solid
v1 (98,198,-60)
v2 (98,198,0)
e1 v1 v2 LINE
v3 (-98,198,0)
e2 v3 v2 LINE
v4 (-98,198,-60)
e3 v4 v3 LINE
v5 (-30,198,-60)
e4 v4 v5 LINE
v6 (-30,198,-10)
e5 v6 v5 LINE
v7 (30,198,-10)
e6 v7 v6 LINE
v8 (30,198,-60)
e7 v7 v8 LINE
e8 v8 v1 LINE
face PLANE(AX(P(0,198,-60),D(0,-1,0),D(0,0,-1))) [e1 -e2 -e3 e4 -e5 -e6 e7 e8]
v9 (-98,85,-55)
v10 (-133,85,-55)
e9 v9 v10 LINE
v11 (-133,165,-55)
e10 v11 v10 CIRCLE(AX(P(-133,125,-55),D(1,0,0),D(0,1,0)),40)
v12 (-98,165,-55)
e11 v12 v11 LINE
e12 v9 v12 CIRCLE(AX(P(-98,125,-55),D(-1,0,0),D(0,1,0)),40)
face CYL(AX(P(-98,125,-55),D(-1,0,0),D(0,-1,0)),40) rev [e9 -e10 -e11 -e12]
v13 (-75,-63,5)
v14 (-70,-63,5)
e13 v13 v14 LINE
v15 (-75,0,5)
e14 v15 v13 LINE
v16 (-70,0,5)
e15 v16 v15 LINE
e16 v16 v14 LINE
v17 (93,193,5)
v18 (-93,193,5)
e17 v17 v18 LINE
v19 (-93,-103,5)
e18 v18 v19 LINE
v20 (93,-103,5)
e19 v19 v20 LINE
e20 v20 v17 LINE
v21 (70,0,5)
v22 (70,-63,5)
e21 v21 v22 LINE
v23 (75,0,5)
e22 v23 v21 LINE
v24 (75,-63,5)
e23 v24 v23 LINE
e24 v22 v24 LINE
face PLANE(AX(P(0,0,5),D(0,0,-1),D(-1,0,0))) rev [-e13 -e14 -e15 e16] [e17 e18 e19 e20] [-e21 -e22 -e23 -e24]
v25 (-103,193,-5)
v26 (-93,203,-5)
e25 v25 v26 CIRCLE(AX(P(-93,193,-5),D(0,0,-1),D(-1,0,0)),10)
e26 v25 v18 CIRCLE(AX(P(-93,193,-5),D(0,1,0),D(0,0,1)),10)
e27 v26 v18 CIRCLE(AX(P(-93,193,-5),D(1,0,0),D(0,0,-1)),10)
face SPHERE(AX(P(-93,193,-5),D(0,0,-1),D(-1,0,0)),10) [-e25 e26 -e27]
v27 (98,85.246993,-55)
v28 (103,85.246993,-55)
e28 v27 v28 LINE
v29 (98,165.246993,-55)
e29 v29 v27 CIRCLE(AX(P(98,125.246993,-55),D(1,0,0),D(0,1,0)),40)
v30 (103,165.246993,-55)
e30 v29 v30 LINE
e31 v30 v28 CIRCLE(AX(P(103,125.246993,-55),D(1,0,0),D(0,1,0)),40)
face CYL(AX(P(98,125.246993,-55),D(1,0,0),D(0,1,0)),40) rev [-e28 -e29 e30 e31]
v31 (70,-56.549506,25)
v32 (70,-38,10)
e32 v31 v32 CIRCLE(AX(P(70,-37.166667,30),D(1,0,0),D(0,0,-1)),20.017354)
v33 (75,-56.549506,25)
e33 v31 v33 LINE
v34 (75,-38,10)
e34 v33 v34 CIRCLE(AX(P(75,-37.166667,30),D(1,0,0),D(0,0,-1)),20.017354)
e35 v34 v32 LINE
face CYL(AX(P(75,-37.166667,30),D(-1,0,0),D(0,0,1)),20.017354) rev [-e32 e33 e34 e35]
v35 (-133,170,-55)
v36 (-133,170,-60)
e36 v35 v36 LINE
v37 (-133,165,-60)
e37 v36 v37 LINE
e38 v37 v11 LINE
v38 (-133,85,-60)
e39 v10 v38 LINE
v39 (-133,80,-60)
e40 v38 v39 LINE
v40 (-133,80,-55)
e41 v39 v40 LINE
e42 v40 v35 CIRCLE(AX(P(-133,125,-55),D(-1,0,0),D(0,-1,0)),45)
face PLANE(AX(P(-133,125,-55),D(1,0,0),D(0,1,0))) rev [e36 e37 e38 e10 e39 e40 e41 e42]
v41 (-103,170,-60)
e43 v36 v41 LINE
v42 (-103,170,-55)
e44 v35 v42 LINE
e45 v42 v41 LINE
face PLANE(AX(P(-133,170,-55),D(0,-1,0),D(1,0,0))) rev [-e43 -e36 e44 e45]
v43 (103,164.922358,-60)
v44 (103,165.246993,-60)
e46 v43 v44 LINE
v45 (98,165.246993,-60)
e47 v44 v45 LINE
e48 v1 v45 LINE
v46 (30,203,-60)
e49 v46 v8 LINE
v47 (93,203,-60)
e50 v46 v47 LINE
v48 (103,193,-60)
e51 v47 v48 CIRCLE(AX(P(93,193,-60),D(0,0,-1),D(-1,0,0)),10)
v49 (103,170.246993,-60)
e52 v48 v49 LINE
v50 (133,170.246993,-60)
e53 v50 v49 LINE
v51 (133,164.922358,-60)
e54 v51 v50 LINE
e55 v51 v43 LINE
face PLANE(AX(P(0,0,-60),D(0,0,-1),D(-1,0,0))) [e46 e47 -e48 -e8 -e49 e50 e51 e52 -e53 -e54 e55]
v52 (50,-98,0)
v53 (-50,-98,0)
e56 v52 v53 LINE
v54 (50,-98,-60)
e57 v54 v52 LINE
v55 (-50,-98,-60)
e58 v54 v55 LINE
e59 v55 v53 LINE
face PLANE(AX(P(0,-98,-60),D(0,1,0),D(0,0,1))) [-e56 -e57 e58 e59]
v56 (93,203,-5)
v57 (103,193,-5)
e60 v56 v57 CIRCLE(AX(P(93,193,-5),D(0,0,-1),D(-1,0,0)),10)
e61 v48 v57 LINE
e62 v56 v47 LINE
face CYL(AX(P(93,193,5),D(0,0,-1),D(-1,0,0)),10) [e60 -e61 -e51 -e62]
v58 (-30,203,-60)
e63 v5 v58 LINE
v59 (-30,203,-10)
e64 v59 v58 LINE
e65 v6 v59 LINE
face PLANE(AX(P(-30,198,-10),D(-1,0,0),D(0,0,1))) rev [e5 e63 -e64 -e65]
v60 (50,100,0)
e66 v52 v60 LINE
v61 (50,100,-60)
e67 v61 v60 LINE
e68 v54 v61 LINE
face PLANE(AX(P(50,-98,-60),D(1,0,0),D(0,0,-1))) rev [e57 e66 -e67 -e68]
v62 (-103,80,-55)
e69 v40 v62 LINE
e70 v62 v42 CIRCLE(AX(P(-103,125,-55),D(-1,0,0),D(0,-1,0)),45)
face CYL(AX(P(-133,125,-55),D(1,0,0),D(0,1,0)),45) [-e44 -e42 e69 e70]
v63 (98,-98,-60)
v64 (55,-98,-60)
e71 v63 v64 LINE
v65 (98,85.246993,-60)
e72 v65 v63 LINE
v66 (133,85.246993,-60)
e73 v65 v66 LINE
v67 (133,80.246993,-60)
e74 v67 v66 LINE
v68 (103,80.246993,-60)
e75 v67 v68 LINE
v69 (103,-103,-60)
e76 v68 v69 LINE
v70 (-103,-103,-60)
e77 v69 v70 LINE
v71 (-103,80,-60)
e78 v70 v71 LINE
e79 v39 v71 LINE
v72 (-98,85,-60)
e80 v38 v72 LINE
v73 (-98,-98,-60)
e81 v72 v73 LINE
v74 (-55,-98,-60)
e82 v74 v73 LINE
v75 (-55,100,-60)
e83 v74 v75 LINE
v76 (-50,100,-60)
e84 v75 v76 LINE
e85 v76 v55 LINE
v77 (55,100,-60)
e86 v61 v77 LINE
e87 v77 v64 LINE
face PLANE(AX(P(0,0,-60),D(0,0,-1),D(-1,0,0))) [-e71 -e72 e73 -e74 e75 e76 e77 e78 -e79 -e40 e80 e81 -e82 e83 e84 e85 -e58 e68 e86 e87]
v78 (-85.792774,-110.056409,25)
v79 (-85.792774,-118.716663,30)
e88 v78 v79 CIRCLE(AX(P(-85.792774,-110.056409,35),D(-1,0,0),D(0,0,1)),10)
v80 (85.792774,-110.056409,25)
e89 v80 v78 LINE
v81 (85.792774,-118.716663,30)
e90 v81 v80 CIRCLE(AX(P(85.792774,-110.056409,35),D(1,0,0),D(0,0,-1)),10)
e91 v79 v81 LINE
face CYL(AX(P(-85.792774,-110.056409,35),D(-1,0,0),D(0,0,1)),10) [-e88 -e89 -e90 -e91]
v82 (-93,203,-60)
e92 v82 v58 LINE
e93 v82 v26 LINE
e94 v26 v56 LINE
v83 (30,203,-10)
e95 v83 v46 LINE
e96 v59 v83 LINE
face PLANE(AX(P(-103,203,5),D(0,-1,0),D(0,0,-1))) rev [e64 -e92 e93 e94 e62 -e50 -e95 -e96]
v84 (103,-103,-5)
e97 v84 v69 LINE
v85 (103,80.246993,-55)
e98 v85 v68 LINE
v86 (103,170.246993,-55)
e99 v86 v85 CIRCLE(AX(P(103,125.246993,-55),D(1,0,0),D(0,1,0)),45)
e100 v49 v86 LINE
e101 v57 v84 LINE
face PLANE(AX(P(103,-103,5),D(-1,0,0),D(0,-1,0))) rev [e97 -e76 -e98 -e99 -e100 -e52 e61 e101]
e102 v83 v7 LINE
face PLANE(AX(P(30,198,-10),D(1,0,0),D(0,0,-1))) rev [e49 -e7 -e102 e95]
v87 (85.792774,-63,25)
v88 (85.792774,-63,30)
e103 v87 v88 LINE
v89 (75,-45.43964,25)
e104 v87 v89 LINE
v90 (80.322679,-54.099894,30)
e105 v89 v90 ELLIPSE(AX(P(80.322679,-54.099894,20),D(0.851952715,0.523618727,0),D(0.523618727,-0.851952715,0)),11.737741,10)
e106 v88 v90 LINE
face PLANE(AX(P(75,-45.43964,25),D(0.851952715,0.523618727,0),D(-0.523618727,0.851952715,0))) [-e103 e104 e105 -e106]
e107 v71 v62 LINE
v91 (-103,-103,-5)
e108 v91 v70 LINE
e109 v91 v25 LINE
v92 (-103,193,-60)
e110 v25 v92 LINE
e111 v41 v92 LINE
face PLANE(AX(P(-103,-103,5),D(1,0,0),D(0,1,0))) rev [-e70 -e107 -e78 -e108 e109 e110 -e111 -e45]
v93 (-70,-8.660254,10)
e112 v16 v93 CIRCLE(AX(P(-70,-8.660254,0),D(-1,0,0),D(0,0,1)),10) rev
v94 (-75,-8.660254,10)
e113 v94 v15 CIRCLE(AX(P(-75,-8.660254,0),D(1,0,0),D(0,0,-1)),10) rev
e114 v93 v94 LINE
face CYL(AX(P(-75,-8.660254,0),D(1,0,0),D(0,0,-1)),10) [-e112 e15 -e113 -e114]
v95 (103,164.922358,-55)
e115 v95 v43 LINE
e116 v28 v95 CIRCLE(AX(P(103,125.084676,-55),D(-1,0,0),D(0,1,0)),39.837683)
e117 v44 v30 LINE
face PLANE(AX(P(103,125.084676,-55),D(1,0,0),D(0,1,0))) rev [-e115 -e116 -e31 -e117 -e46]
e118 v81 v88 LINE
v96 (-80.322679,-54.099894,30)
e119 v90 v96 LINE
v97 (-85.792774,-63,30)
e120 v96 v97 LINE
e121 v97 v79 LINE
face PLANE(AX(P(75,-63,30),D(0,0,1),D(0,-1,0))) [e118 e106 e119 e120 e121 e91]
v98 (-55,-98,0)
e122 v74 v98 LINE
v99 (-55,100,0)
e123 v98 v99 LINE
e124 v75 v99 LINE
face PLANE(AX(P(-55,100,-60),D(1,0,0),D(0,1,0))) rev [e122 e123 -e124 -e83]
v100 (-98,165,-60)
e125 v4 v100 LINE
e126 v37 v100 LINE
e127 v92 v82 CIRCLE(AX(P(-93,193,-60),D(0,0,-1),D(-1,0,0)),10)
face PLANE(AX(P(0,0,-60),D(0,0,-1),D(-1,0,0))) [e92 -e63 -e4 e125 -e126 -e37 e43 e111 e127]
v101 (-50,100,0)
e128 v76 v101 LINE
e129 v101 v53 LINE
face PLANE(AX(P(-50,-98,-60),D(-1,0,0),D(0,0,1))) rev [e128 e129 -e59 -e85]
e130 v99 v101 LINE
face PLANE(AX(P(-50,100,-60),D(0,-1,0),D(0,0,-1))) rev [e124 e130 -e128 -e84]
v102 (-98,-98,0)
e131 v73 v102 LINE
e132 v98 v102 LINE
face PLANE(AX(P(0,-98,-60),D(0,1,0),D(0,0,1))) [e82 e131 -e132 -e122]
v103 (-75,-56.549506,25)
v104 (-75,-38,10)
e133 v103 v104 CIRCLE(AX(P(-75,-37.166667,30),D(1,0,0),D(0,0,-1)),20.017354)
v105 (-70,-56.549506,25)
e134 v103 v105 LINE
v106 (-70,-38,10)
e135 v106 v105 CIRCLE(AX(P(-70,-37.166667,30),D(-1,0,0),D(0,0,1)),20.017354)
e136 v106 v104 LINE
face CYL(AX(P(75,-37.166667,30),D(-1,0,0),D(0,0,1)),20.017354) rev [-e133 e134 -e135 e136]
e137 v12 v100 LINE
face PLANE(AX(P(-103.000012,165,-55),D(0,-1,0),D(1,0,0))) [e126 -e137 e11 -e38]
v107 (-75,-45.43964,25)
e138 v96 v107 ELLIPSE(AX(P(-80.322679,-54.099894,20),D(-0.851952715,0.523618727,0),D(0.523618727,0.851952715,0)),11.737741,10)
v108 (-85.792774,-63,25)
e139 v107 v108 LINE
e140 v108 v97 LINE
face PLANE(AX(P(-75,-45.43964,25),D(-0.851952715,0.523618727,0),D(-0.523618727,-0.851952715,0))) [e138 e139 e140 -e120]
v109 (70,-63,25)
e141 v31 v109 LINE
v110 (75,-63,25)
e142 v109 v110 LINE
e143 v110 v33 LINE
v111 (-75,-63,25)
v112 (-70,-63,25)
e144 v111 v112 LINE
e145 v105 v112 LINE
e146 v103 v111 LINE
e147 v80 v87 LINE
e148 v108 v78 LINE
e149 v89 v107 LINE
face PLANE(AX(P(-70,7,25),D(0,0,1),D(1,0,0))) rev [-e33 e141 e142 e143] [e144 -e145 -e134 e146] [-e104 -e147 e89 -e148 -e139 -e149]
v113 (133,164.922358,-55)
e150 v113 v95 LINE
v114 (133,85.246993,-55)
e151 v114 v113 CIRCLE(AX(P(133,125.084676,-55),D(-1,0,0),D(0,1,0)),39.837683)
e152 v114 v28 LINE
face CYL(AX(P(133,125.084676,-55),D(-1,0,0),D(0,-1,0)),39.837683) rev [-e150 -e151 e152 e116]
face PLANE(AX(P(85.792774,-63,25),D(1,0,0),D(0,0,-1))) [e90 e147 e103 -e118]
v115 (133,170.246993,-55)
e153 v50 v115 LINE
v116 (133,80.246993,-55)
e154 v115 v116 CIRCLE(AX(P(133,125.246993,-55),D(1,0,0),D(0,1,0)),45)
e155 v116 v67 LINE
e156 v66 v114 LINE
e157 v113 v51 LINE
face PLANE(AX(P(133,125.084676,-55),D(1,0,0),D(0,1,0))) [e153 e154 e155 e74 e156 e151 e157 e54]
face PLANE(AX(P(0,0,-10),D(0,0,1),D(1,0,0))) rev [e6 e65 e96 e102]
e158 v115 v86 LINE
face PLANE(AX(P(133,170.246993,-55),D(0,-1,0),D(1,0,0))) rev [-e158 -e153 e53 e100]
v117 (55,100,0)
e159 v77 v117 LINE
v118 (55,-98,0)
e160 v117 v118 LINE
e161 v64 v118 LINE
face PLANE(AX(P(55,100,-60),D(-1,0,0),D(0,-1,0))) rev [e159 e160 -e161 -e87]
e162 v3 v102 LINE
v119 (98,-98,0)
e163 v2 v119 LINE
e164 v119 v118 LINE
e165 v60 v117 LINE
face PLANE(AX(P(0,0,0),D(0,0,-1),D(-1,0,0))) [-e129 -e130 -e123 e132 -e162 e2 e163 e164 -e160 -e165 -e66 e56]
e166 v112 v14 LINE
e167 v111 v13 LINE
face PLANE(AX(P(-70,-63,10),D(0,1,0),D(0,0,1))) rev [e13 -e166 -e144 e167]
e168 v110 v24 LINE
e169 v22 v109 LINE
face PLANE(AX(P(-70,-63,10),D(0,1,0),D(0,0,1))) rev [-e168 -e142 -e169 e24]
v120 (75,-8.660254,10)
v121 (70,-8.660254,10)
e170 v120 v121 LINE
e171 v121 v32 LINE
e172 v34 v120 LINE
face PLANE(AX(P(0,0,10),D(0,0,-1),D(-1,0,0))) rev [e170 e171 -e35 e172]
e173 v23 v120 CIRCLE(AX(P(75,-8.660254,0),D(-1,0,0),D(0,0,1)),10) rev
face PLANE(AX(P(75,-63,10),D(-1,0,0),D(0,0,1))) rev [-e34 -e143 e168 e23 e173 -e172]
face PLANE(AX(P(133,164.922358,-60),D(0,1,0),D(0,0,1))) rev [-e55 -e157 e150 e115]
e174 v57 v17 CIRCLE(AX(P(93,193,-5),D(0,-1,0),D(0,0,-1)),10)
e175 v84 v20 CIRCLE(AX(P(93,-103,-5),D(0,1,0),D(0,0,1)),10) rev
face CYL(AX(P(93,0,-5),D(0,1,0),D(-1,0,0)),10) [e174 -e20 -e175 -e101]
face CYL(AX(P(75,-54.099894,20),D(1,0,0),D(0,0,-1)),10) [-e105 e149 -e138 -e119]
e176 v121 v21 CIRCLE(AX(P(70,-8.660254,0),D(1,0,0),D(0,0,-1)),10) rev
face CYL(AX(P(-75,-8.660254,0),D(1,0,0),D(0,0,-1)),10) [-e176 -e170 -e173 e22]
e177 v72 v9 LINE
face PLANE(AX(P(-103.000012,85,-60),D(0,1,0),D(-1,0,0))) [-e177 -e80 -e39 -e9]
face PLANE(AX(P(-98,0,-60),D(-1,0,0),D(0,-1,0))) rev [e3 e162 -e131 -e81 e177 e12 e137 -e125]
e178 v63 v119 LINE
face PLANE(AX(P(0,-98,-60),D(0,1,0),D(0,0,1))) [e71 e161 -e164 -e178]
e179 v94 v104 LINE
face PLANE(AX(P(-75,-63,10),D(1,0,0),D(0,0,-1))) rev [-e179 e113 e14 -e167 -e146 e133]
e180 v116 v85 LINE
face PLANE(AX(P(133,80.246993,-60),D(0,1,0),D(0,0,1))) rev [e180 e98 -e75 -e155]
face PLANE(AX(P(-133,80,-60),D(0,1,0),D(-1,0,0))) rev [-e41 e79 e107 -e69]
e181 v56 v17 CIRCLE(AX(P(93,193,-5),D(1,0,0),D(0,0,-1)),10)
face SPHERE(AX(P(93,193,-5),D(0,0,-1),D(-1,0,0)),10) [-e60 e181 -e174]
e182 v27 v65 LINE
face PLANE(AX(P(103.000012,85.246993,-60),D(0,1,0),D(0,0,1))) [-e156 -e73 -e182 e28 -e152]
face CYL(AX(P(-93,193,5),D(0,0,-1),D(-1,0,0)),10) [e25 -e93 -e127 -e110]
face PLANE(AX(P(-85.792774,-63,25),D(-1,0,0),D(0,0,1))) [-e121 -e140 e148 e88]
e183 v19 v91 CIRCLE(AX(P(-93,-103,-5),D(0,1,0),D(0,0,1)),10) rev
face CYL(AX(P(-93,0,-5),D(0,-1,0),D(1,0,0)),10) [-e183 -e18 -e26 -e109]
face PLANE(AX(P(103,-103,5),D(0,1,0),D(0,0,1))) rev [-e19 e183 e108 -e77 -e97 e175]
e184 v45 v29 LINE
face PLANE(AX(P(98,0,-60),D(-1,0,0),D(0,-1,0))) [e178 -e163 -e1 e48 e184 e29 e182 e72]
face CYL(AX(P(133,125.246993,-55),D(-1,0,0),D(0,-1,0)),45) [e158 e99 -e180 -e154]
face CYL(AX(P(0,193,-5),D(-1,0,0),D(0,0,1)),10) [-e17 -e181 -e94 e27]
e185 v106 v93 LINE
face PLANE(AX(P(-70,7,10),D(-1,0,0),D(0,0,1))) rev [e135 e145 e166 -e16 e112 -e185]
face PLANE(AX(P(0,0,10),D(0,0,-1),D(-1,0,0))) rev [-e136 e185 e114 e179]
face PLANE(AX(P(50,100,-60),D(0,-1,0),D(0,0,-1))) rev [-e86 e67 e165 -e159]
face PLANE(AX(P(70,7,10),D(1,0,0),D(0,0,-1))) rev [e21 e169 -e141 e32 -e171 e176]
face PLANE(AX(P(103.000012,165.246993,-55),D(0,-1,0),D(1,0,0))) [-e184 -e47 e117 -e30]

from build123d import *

# Parameters (mm, degrees)
SKETCH1_W               = 206
SKETCH1_H               = 306
BOSS_EXTRUDE2_DEPTH     = 5
SKETCH2_W               = 206
SKETCH2_H               = 306
SKETCH2_W_2             = 196
SKETCH2_H_2             = 296
BOSS_EXTRUDE3_DEPTH     = 60
SKETCH3_W               = 5
SKETCH3_H               = 198
BOSS_EXTRUDE4_DEPTH     = 60
SKETCH10_W              = 60
SKETCH10_H              = 5
CUT_EXTRUDE3_DEPTH      = 50
CUT_EXTRUDE4_DEPTH      = 296.372645991
CUT_EXTRUDE4_DEPTH_BACK = 5
BOSS_EXTRUDE6_DEPTH     = 30
CUT_EXTRUDE5_DEPTH      = 318.025235589
CUT_EXTRUDE5_DEPTH_BACK = 5
BOSS_EXTRUDE7_DEPTH     = 30
SKETCH16_W              = 5
SKETCH16_H              = 63
BOSS_EXTRUDE8_DEPTH     = 5
BOSS_EXTRUDE10_DEPTH    = 150
SKETCH19_W              = 140
SKETCH19_H              = 20
CUT_EXTRUDE6_DEPTH      = 70
BOSS_EXTRUDE11_DEPTH    = 5
FILLET3_R               = 10
FILLET4_R               = 10
FILLET5_R               = 10
FILLET6_R               = 10
FILLET7_R               = 10
FILLET8_R               = 10
FILLET9_R               = 10


with BuildPart() as part:
    # Sketch1 → Boss-Extrude2 (new body)
    with BuildSketch(Plane.XY):
        with Locations((0, 50)):
            Rectangle(SKETCH1_W, SKETCH1_H)
    extrude(amount=BOSS_EXTRUDE2_DEPTH)

    # Sketch2 → Boss-Extrude3 (add)
    with BuildSketch(Plane(origin=(0, 0, 0), x_dir=(-1, 0, 0), z_dir=(0, 0, -1))):
        with Locations((0, 50)):
            Rectangle(SKETCH2_W, SKETCH2_H)
        with Locations((0, 50)):
            Rectangle(SKETCH2_W_2, SKETCH2_H_2, mode=Mode.SUBTRACT)
    extrude(amount=BOSS_EXTRUDE3_DEPTH)

    # Sketch3 → Boss-Extrude4 (add)
    with BuildSketch(Plane(origin=(0, 0, 0), x_dir=(-1, 0, 0), z_dir=(0, 0, -1))):
        with Locations((-52.5, 1)):
            Rectangle(SKETCH3_W, SKETCH3_H)
        with Locations((52.5, 1)):
            Rectangle(SKETCH3_W, SKETCH3_H)
    extrude(amount=BOSS_EXTRUDE4_DEPTH)

    # Sketch10 → Cut-Extrude3 (cut)
    with BuildSketch(Plane(origin=(0, 0, -60), x_dir=(-1, 0, 0), z_dir=(0, 0, -1))):
        with Locations((0, 200.5)):
            Rectangle(SKETCH10_W, SKETCH10_H)
    extrude(amount=-CUT_EXTRUDE3_DEPTH, mode=Mode.SUBTRACT)

    # Sketch11 → Cut-Extrude4 (cut, two sides: drawn at the far end of the back side and taken through both)
    with BuildSketch(Plane(origin=(103, 0, 0), x_dir=(0, 0, -1), z_dir=(1, 0, 0)).offset(-CUT_EXTRUDE4_DEPTH_BACK)):
        with BuildLine():
            Line((55, 165.246993189), (60, 165.246993189))
            Line((60, 165.246993189), (60, 85.246993189))
            Line((60, 85.246993189), (55, 85.246993189))
            ThreePointArc((55, 85.246993189), (15, 125.246993189), (55, 165.246993189))
        make_face()
    extrude(amount=CUT_EXTRUDE4_DEPTH + CUT_EXTRUDE4_DEPTH_BACK, mode=Mode.SUBTRACT)

    # Sketch12 → Boss-Extrude6 (add)
    with BuildSketch(Plane(origin=(103, 0, 0), x_dir=(0, 0, -1), z_dir=(1, 0, 0))):
        with BuildLine():
            Line((55, 170.246993189), (60, 170.246993189))
            Line((60, 170.246993189), (60, 164.922358247))
            Line((60, 164.922358247), (55, 164.922358247))
            ThreePointArc((55, 164.922358247), (15.162317471, 125.084675718), (55, 85.246993189))
            Line((55, 85.246993189), (60, 85.246993189))
            Line((60, 85.246993189), (60, 80.246993189))
            Line((60, 80.246993189), (55, 80.246993189))
            ThreePointArc((55, 80.246993189), (10, 125.246993189), (55, 170.246993189))
        make_face()
    extrude(amount=BOSS_EXTRUDE6_DEPTH)

    # Sketch13 → Cut-Extrude5 (cut, two sides: drawn at the far end of the back side and taken through both)
    with BuildSketch(Plane.ZY.offset(103).offset(-CUT_EXTRUDE5_DEPTH_BACK)):
        with BuildLine():
            Line((-55, 165), (-60, 165))
            Line((-60, 165), (-60, 85))
            Line((-60, 85), (-55, 85))
            ThreePointArc((-55, 85), (-15, 125), (-55, 165))
        make_face()
    extrude(amount=CUT_EXTRUDE5_DEPTH + CUT_EXTRUDE5_DEPTH_BACK, mode=Mode.SUBTRACT)

    # Sketch14 → Boss-Extrude7 (add)
    with BuildSketch(Plane.ZY.offset(103)):
        with BuildLine():
            Line((-55, 170), (-60, 170))
            Line((-60, 170), (-60, 165))
            Line((-60, 165), (-55, 165))
            ThreePointArc((-55, 165), (-15, 125), (-55, 85))
            Line((-55, 85), (-60, 85))
            Line((-60, 85), (-60, 80))
            Line((-60, 80), (-55, 80))
            ThreePointArc((-55, 80), (-10, 125), (-55, 170))
        make_face()
    extrude(amount=BOSS_EXTRUDE7_DEPTH)

    # Sketch16 → Boss-Extrude8 (add)
    with BuildSketch(Plane.XY.offset(5)):
        with Locations((-72.5, -31.5)):
            Rectangle(SKETCH16_W, SKETCH16_H)
        with Locations((72.5, -31.5)):
            Rectangle(SKETCH16_W, SKETCH16_H)
    extrude(amount=BOSS_EXTRUDE8_DEPTH)

    # Sketch17 → Boss-Extrude10 (add)
    with BuildSketch(Plane.ZY.offset(75)):
        with BuildLine():
            Line((5, -63), (30, -63))
            Line((30, -63), (30, -57.184020249))
            ThreePointArc((30, -57.184020249), (16.143353283, -51.612696786), (10, -38))
            Line((10, -38), (10, 0))
            Line((10, 0), (5, 0))
            Line((5, 0), (5, -63))
        make_face()
    extrude(amount=-BOSS_EXTRUDE10_DEPTH)

    # Sketch19 → Cut-Extrude6 (cut)
    with BuildSketch(Plane.XZ.offset(63)):
        with Locations((0, 15)):
            Rectangle(SKETCH19_W, SKETCH19_H)
    extrude(amount=-CUT_EXTRUDE6_DEPTH, mode=Mode.SUBTRACT)

    # Sketch20 → Boss-Extrude11 (add)
    with BuildSketch(Plane.XY.offset(30)):
        Polygon((75, -45.439640401), (-75, -45.439640401), (-85.792774028, -63), (-85.792774028, -118.716663175), (85.792774028, -118.716663175), (85.792774028, -63), align=None)
    extrude(amount=-BOSS_EXTRUDE11_DEPTH)

    # Fillet3
    fillet3_edges = [part.edges().sort_by_distance(p)[0] for p in [
        (-103, 203, -27.5),
    ]]
    fillet(fillet3_edges, radius=FILLET3_R)

    # Fillet4
    fillet4_edges = [part.edges().sort_by_distance(p)[0] for p in [
        (103, 203, -27.5),
    ]]
    fillet(fillet4_edges, radius=FILLET4_R)

    # Fillet5
    # the kernel refuses this fillet: 10 mm, written as the material it takes off along each edge
    with BuildSketch(Plane(origin=(96.650635095, -45.439640401, 30), x_dir=(0, 0, -1), z_dir=(-1, 0, 0))) as fillet5_piece_1:
        with BuildLine():
            CenterArc((10, 8.660254038), FILLET5_R, 180, 60)
            Line((0, 8.660254038), (-0.2, 8.660254038))
            Line((-0.2, 8.660254038), (-0.2, 0))
            Line((-0.2, 0), (0, -0.2))
            ThreePointArc((0, -0.2), (2.5, -0.2), (4.9, -0.173205081))
            Line((4.9, -0.173205081), (5, 0))
        make_face()
    extrude(amount=193.301270189, mode=Mode.SUBTRACT)

    # Fillet6
    # the kernel refuses this fillet: 10 mm, written as the material it takes off along each edge
    with BuildSketch(Plane(origin=(-107.443409123, -118.716663175, 25), x_dir=(0, 1, 0), z_dir=(1, 0, 0))) as fillet6_piece_1:
        with BuildLine():
            CenterArc((8.660254038, 10), FILLET6_R, 210, 60)
            Line((0, 5), (-0.173205081, 4.9))
            ThreePointArc((-0.173205081, 4.9), (-0.2, 2.5), (-0.2, 0))
            Line((-0.2, 0), (0, -0.2))
            Line((0, -0.2), (8.660254038, -0.2))
            Line((8.660254038, -0.2), (8.660254038, 0))
        make_face()
    extrude(amount=214.886818246, mode=Mode.SUBTRACT)

    # Fillet7
    # the kernel refuses this fillet: 10 mm, written as the material it takes off along each edge
    with BuildSketch(Plane(origin=(-96.650635095, 0, 10), x_dir=(0, 0, -1), z_dir=(1, 0, 0))) as fillet7_piece_1:
        with BuildLine():
            CenterArc((10, -8.660254038), FILLET7_R, 120, 60)
            Line((0, -8.660254038), (-0.2, -8.660254038))
            Line((-0.2, -8.660254038), (-0.2, 0))
            Line((-0.2, 0), (0, 0.2))
            ThreePointArc((0, 0.2), (2.5, 0.2), (4.9, 0.173205081))
            Line((4.9, 0.173205081), (5, 0))
        make_face()
    extrude(amount=48.301270189, mode=Mode.SUBTRACT)

    # Fillet8
    # the kernel refuses this fillet: 10 mm, written as the material it takes off along each edge
    with BuildSketch(Plane(origin=(48.349364905, 0, 10), x_dir=(0, 0, -1), z_dir=(1, 0, 0))) as fillet8_piece_1:
        with BuildLine():
            CenterArc((10, -8.660254038), FILLET8_R, 120, 60)
            Line((0, -8.660254038), (-0.2, -8.660254038))
            Line((-0.2, -8.660254038), (-0.2, 0))
            Line((-0.2, 0), (0, 0.2))
            ThreePointArc((0, 0.2), (2.5, 0.2), (4.9, 0.173205081))
            Line((4.9, 0.173205081), (5, 0))
        make_face()
    extrude(amount=48.301270189, mode=Mode.SUBTRACT)

    # Fillet9
    # the kernel refuses this fillet: 10 mm, written as the material it takes off along each edge
    with BuildSketch(Plane(origin=(103, 193, 5), x_dir=(-1, 0, 0), z_dir=(0, -1, 0)), Plane(origin=(-103, -128, 5), x_dir=(1, 0, 0), z_dir=(0, 1, 0))) as fillet9_piece_1:
        with BuildLine():
            CenterArc((FILLET9_R, FILLET9_R), FILLET9_R, 180, 90)
            Line((0, FILLET9_R), (0, 0))
            Line((0, 0), (FILLET9_R, 0))
        make_face()
    extrude(amount=321, mode=Mode.SUBTRACT)
    with BuildSketch(Plane(origin=(-93, 193, 5), x_dir=(-1, 0, 0), z_dir=(0, -1, 0))) as fillet9_piece_2:
        with BuildLine():
            CenterArc((10 - FILLET9_R, FILLET9_R), FILLET9_R, 270, 90)
            Line((10, FILLET9_R), (10, 0))
            Line((10, 0), (10 - FILLET9_R, 0))
        make_face()
    revolve(axis=Axis((-93, 193, 5), (0, 0, -1)), revolution_arc=90, mode=Mode.SUBTRACT)
    with BuildSketch(Plane(origin=(-93, 203, 5), x_dir=(0, -1, 0), z_dir=(1, 0, 0))) as fillet9_piece_3:
        with BuildLine():
            CenterArc((FILLET9_R, FILLET9_R), FILLET9_R, 180, 90)
            Line((0, FILLET9_R), (0, 0))
            Line((0, 0), (FILLET9_R, 0))
        make_face()
    extrude(amount=186, mode=Mode.SUBTRACT)
    with BuildSketch(Plane(origin=(93, 193, 5), x_dir=(0, 1, 0), z_dir=(-1, 0, 0))) as fillet9_piece_4:
        with BuildLine():
            CenterArc((10 - FILLET9_R, FILLET9_R), FILLET9_R, 270, 90)
            Line((10, FILLET9_R), (10, 0))
            Line((10, 0), (10 - FILLET9_R, 0))
        make_face()
    revolve(axis=Axis((93, 193, 5), (0, 0, -1)), revolution_arc=90, mode=Mode.SUBTRACT)


solid = part.part
